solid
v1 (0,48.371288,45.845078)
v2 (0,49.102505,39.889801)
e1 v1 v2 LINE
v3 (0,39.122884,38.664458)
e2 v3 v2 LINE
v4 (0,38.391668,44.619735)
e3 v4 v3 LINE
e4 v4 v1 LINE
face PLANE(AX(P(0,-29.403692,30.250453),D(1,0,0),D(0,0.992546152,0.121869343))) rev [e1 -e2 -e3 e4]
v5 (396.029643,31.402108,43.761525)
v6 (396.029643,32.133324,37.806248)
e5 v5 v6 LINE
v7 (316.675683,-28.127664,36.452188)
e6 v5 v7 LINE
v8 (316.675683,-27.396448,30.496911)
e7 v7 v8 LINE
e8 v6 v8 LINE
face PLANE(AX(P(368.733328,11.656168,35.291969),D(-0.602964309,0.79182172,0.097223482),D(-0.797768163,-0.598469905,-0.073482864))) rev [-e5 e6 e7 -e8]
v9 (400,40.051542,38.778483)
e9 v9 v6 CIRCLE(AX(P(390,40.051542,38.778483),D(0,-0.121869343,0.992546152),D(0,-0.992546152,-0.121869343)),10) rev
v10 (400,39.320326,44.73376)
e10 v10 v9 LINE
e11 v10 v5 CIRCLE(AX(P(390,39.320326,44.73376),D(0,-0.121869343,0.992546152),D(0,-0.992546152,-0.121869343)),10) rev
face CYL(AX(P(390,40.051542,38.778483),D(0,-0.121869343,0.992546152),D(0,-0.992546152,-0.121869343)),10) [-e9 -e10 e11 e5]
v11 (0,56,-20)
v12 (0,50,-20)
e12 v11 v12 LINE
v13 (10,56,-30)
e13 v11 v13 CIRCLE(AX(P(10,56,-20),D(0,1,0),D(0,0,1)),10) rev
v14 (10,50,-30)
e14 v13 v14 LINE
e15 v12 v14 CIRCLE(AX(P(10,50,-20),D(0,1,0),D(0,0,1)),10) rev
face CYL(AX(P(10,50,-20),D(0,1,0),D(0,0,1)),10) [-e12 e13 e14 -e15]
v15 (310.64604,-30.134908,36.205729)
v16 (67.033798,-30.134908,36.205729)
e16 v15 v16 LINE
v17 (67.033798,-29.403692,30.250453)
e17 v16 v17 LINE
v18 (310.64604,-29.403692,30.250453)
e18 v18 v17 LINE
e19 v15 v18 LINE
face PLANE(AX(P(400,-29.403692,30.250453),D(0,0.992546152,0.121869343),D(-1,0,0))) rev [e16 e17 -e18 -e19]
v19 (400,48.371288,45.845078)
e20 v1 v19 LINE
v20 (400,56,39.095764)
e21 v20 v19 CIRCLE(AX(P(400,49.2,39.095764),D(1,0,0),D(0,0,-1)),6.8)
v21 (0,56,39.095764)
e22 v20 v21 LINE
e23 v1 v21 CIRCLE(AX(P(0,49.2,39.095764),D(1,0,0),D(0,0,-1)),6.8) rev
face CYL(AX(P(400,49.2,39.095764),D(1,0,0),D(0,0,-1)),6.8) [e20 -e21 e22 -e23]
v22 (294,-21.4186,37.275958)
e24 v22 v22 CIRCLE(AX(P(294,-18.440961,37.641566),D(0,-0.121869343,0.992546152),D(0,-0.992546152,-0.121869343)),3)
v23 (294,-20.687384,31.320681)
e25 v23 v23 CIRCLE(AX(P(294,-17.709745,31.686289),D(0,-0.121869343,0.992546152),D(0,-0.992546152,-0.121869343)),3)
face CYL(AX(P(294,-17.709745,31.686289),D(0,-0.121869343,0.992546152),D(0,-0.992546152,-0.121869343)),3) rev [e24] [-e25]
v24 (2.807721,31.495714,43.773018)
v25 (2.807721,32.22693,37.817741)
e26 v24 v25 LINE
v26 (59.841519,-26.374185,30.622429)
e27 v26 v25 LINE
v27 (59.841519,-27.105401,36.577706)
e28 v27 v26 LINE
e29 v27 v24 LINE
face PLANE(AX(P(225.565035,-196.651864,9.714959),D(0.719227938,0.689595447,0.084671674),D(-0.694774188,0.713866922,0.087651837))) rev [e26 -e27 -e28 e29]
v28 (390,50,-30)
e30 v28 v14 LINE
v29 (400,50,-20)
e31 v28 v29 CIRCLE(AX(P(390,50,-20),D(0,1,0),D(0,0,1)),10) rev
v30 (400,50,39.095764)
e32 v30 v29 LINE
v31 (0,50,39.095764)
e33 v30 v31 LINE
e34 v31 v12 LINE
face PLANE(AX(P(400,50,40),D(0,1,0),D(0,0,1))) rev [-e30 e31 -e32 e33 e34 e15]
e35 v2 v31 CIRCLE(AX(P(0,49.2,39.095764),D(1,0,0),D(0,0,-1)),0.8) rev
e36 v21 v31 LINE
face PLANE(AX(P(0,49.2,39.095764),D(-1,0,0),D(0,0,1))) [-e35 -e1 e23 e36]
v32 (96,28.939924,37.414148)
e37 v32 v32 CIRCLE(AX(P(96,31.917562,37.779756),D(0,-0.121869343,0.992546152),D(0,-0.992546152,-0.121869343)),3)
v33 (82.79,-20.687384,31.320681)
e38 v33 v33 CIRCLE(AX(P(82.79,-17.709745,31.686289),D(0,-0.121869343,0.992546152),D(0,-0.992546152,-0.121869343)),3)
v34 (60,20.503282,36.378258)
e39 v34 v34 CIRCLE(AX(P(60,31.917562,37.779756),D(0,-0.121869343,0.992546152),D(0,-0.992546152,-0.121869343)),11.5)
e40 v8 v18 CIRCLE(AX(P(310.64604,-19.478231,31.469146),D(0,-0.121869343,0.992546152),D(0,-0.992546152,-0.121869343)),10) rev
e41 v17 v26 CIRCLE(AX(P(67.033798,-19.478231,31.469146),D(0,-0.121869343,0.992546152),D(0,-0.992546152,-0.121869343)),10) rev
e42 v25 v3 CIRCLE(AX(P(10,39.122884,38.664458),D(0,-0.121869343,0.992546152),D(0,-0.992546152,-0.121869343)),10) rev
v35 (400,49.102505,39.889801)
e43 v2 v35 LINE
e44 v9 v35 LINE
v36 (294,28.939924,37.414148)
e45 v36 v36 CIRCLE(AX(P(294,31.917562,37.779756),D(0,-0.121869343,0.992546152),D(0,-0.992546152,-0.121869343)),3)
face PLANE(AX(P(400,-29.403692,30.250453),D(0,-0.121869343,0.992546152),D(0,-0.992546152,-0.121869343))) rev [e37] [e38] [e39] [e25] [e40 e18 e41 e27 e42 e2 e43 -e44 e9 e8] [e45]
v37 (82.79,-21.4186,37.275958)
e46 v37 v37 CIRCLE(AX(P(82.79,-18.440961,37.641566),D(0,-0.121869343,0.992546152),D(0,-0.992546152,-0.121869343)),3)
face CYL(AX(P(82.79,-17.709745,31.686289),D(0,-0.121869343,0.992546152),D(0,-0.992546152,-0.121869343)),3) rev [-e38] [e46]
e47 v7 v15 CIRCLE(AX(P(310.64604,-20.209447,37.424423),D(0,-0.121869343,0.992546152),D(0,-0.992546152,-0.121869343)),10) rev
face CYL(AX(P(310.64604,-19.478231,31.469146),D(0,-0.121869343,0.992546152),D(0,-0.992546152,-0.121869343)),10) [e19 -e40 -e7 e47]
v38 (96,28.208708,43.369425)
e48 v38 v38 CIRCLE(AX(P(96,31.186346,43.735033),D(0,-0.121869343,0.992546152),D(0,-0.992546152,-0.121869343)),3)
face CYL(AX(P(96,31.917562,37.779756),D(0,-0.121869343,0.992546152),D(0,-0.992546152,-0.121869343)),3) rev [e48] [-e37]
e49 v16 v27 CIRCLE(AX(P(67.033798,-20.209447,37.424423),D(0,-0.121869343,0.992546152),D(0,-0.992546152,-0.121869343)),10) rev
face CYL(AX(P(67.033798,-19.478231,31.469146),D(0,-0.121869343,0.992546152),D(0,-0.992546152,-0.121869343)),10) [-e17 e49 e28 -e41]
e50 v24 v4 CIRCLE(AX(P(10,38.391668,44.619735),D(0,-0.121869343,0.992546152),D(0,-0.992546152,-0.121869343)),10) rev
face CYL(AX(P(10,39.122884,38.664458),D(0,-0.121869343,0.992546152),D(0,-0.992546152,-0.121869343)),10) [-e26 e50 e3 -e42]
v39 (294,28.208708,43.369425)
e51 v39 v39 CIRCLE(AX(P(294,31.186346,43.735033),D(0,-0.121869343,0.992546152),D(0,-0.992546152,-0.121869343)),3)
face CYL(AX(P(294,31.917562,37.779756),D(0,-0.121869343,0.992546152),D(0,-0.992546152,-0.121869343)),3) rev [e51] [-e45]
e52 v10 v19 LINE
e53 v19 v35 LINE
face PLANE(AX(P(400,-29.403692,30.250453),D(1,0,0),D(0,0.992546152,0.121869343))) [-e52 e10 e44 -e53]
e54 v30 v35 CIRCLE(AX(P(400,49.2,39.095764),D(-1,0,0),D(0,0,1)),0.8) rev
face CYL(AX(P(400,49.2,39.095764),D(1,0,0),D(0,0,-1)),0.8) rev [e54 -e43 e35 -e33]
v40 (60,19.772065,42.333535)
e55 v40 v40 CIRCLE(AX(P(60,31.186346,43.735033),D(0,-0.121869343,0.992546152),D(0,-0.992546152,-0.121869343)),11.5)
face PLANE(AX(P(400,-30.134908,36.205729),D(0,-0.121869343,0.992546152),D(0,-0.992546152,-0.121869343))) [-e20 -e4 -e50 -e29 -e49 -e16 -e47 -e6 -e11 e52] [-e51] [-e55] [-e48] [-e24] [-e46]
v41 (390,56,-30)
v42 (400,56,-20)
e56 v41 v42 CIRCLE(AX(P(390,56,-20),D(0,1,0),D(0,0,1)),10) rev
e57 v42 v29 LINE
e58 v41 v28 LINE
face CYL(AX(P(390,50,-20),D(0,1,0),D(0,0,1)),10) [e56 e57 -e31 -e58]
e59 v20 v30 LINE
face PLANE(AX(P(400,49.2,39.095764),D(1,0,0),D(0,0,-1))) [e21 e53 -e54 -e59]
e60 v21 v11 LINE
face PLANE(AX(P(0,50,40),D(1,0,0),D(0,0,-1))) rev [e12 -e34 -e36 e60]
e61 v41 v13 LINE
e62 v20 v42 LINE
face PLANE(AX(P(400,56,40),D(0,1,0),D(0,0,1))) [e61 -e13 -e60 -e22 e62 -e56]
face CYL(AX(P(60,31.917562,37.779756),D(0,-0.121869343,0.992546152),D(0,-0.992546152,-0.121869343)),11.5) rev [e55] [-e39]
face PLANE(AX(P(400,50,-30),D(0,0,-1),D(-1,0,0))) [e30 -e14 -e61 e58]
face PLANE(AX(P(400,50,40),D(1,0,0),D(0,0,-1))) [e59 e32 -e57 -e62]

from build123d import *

# Parameters (mm, degrees)
BOSS_EXTRUDE1_DEPTH    = 400
SKETCH2_R              = 3
SKETCH2_R_2            = 11.5
CUT_EXTRUDE1_DEPTH     = 10
CUT_EXTRUDE2_DEPTH     = 411.492681542
FILLET1_R              = 10
FILLET2_R              = 10
CONVERT_SOLID1_DEPTH   = 400
CONVERT_SOLID1_2_DEPTH = 400


# Read off the part's stored shape, not the designer's step: Convert-Solid1
with BuildPart() as part:
    # Sketch1 → Boss-Extrude1 (new body)
    with BuildSketch(Plane(origin=(0, 0, 0), x_dir=(0, 0, -1), z_dir=(1, 0, 0))):
        Polygon((-30.250452528, -29.403692131), (-40, 50), (30, 50), (30, 56), (-46.781766318, 56), (-36.205729437, -30.134908192), align=None)
    extrude(amount=BOSS_EXTRUDE1_DEPTH)

    # Sketch2 → Cut-Extrude1 (cut)
    with BuildSketch(Plane(origin=(0, -4.827047129, 39.313144045), x_dir=(1, 0, 0), z_dir=(0, -0.12186934340515194, 0.9925461516413215))):
        with Locations(Location((96, 36.283847636, 0), (0, 0, 270))):
            Circle(SKETCH2_R)
        with Locations(Location((294, 36.283847636, 0), (0, 0, 270))):
            Circle(SKETCH2_R)
        with Locations(Location((294, -13.716152364, 0), (0, 0, 270))):
            Circle(SKETCH2_R)
        with Locations(Location((60, 36.283847636, 0), (0, 0, 270))):
            Circle(SKETCH2_R_2)
        with Locations(Location((82.79, -13.716152364, 0), (0, 0, 270))):
            Circle(SKETCH2_R)
    extrude(amount=-CUT_EXTRUDE1_DEPTH, mode=Mode.SUBTRACT)

    # Sketch3 → Cut-Extrude2 (cut, through all)
    with BuildSketch(Plane(origin=(0, -4.827047129, 39.313144045), x_dir=(1, 0, 0), z_dir=(0, -0.12186934340515194, 0.9925461516413215))):
        Polygon((314, -25.497918682), (400, 39.502081318), (421.348881307, 33.662382961), (421.69701633, -53.203923072), (314, -56.960779507), align=None)
        Polygon((-35.970836278, 39.502081318), (0, 39.502081318), (62.79, -25.497918682), (64.049370498, -44.831722112), (-31.822947487, -47.152069291), align=None)
    extrude(amount=-CUT_EXTRUDE2_DEPTH, mode=Mode.SUBTRACT)

    # Fillet1
    fillet1_edges = [part.edges().sort_by_distance(p)[0] for p in [
        (400, 34.746199695, 41.149598304),
        (314, -29.769300162, 33.228090983),
        (0, 34.746199695, 41.149598304),
        (62.79, -29.769300162, 33.228090983),
    ]]
    fillet(fillet1_edges, radius=FILLET1_R)

    # Fillet2
    fillet2_edges = [part.edges().sort_by_distance(p)[0] for p in [
        (400, 53, -30),
        (0, 53, -30),
    ]]
    fillet(fillet2_edges, radius=FILLET2_R)

    # Convert-Solid1 outline → Convert-Solid1 (cut)
    with BuildSketch(Plane.YZ):
        with BuildLine():
            ThreePointArc((48.371288465, 45.845078322), (53.705816328, 44.188663392), (56, 39.095764491))
            Line((56, 39.095764491), (56, 46.781766318))
            Line((56, 46.781766318), (48.371288465, 45.845078322))
        make_face()
    extrude(amount=CONVERT_SOLID1_DEPTH, mode=Mode.SUBTRACT)

    # Convert-Solid1 2 outline → Convert-Solid1 2 (add)
    with BuildSketch(Plane.YZ):
        with BuildLine():
            ThreePointArc((49.102504525, 39.889801412), (49.730096039, 39.694929068), (50, 39.095764491))
            Line((50, 39.095764491), (50, 40))
            Line((50, 40), (49.102504525, 39.889801412))
        make_face()
    extrude(amount=CONVERT_SOLID1_2_DEPTH)


solid = part.part
